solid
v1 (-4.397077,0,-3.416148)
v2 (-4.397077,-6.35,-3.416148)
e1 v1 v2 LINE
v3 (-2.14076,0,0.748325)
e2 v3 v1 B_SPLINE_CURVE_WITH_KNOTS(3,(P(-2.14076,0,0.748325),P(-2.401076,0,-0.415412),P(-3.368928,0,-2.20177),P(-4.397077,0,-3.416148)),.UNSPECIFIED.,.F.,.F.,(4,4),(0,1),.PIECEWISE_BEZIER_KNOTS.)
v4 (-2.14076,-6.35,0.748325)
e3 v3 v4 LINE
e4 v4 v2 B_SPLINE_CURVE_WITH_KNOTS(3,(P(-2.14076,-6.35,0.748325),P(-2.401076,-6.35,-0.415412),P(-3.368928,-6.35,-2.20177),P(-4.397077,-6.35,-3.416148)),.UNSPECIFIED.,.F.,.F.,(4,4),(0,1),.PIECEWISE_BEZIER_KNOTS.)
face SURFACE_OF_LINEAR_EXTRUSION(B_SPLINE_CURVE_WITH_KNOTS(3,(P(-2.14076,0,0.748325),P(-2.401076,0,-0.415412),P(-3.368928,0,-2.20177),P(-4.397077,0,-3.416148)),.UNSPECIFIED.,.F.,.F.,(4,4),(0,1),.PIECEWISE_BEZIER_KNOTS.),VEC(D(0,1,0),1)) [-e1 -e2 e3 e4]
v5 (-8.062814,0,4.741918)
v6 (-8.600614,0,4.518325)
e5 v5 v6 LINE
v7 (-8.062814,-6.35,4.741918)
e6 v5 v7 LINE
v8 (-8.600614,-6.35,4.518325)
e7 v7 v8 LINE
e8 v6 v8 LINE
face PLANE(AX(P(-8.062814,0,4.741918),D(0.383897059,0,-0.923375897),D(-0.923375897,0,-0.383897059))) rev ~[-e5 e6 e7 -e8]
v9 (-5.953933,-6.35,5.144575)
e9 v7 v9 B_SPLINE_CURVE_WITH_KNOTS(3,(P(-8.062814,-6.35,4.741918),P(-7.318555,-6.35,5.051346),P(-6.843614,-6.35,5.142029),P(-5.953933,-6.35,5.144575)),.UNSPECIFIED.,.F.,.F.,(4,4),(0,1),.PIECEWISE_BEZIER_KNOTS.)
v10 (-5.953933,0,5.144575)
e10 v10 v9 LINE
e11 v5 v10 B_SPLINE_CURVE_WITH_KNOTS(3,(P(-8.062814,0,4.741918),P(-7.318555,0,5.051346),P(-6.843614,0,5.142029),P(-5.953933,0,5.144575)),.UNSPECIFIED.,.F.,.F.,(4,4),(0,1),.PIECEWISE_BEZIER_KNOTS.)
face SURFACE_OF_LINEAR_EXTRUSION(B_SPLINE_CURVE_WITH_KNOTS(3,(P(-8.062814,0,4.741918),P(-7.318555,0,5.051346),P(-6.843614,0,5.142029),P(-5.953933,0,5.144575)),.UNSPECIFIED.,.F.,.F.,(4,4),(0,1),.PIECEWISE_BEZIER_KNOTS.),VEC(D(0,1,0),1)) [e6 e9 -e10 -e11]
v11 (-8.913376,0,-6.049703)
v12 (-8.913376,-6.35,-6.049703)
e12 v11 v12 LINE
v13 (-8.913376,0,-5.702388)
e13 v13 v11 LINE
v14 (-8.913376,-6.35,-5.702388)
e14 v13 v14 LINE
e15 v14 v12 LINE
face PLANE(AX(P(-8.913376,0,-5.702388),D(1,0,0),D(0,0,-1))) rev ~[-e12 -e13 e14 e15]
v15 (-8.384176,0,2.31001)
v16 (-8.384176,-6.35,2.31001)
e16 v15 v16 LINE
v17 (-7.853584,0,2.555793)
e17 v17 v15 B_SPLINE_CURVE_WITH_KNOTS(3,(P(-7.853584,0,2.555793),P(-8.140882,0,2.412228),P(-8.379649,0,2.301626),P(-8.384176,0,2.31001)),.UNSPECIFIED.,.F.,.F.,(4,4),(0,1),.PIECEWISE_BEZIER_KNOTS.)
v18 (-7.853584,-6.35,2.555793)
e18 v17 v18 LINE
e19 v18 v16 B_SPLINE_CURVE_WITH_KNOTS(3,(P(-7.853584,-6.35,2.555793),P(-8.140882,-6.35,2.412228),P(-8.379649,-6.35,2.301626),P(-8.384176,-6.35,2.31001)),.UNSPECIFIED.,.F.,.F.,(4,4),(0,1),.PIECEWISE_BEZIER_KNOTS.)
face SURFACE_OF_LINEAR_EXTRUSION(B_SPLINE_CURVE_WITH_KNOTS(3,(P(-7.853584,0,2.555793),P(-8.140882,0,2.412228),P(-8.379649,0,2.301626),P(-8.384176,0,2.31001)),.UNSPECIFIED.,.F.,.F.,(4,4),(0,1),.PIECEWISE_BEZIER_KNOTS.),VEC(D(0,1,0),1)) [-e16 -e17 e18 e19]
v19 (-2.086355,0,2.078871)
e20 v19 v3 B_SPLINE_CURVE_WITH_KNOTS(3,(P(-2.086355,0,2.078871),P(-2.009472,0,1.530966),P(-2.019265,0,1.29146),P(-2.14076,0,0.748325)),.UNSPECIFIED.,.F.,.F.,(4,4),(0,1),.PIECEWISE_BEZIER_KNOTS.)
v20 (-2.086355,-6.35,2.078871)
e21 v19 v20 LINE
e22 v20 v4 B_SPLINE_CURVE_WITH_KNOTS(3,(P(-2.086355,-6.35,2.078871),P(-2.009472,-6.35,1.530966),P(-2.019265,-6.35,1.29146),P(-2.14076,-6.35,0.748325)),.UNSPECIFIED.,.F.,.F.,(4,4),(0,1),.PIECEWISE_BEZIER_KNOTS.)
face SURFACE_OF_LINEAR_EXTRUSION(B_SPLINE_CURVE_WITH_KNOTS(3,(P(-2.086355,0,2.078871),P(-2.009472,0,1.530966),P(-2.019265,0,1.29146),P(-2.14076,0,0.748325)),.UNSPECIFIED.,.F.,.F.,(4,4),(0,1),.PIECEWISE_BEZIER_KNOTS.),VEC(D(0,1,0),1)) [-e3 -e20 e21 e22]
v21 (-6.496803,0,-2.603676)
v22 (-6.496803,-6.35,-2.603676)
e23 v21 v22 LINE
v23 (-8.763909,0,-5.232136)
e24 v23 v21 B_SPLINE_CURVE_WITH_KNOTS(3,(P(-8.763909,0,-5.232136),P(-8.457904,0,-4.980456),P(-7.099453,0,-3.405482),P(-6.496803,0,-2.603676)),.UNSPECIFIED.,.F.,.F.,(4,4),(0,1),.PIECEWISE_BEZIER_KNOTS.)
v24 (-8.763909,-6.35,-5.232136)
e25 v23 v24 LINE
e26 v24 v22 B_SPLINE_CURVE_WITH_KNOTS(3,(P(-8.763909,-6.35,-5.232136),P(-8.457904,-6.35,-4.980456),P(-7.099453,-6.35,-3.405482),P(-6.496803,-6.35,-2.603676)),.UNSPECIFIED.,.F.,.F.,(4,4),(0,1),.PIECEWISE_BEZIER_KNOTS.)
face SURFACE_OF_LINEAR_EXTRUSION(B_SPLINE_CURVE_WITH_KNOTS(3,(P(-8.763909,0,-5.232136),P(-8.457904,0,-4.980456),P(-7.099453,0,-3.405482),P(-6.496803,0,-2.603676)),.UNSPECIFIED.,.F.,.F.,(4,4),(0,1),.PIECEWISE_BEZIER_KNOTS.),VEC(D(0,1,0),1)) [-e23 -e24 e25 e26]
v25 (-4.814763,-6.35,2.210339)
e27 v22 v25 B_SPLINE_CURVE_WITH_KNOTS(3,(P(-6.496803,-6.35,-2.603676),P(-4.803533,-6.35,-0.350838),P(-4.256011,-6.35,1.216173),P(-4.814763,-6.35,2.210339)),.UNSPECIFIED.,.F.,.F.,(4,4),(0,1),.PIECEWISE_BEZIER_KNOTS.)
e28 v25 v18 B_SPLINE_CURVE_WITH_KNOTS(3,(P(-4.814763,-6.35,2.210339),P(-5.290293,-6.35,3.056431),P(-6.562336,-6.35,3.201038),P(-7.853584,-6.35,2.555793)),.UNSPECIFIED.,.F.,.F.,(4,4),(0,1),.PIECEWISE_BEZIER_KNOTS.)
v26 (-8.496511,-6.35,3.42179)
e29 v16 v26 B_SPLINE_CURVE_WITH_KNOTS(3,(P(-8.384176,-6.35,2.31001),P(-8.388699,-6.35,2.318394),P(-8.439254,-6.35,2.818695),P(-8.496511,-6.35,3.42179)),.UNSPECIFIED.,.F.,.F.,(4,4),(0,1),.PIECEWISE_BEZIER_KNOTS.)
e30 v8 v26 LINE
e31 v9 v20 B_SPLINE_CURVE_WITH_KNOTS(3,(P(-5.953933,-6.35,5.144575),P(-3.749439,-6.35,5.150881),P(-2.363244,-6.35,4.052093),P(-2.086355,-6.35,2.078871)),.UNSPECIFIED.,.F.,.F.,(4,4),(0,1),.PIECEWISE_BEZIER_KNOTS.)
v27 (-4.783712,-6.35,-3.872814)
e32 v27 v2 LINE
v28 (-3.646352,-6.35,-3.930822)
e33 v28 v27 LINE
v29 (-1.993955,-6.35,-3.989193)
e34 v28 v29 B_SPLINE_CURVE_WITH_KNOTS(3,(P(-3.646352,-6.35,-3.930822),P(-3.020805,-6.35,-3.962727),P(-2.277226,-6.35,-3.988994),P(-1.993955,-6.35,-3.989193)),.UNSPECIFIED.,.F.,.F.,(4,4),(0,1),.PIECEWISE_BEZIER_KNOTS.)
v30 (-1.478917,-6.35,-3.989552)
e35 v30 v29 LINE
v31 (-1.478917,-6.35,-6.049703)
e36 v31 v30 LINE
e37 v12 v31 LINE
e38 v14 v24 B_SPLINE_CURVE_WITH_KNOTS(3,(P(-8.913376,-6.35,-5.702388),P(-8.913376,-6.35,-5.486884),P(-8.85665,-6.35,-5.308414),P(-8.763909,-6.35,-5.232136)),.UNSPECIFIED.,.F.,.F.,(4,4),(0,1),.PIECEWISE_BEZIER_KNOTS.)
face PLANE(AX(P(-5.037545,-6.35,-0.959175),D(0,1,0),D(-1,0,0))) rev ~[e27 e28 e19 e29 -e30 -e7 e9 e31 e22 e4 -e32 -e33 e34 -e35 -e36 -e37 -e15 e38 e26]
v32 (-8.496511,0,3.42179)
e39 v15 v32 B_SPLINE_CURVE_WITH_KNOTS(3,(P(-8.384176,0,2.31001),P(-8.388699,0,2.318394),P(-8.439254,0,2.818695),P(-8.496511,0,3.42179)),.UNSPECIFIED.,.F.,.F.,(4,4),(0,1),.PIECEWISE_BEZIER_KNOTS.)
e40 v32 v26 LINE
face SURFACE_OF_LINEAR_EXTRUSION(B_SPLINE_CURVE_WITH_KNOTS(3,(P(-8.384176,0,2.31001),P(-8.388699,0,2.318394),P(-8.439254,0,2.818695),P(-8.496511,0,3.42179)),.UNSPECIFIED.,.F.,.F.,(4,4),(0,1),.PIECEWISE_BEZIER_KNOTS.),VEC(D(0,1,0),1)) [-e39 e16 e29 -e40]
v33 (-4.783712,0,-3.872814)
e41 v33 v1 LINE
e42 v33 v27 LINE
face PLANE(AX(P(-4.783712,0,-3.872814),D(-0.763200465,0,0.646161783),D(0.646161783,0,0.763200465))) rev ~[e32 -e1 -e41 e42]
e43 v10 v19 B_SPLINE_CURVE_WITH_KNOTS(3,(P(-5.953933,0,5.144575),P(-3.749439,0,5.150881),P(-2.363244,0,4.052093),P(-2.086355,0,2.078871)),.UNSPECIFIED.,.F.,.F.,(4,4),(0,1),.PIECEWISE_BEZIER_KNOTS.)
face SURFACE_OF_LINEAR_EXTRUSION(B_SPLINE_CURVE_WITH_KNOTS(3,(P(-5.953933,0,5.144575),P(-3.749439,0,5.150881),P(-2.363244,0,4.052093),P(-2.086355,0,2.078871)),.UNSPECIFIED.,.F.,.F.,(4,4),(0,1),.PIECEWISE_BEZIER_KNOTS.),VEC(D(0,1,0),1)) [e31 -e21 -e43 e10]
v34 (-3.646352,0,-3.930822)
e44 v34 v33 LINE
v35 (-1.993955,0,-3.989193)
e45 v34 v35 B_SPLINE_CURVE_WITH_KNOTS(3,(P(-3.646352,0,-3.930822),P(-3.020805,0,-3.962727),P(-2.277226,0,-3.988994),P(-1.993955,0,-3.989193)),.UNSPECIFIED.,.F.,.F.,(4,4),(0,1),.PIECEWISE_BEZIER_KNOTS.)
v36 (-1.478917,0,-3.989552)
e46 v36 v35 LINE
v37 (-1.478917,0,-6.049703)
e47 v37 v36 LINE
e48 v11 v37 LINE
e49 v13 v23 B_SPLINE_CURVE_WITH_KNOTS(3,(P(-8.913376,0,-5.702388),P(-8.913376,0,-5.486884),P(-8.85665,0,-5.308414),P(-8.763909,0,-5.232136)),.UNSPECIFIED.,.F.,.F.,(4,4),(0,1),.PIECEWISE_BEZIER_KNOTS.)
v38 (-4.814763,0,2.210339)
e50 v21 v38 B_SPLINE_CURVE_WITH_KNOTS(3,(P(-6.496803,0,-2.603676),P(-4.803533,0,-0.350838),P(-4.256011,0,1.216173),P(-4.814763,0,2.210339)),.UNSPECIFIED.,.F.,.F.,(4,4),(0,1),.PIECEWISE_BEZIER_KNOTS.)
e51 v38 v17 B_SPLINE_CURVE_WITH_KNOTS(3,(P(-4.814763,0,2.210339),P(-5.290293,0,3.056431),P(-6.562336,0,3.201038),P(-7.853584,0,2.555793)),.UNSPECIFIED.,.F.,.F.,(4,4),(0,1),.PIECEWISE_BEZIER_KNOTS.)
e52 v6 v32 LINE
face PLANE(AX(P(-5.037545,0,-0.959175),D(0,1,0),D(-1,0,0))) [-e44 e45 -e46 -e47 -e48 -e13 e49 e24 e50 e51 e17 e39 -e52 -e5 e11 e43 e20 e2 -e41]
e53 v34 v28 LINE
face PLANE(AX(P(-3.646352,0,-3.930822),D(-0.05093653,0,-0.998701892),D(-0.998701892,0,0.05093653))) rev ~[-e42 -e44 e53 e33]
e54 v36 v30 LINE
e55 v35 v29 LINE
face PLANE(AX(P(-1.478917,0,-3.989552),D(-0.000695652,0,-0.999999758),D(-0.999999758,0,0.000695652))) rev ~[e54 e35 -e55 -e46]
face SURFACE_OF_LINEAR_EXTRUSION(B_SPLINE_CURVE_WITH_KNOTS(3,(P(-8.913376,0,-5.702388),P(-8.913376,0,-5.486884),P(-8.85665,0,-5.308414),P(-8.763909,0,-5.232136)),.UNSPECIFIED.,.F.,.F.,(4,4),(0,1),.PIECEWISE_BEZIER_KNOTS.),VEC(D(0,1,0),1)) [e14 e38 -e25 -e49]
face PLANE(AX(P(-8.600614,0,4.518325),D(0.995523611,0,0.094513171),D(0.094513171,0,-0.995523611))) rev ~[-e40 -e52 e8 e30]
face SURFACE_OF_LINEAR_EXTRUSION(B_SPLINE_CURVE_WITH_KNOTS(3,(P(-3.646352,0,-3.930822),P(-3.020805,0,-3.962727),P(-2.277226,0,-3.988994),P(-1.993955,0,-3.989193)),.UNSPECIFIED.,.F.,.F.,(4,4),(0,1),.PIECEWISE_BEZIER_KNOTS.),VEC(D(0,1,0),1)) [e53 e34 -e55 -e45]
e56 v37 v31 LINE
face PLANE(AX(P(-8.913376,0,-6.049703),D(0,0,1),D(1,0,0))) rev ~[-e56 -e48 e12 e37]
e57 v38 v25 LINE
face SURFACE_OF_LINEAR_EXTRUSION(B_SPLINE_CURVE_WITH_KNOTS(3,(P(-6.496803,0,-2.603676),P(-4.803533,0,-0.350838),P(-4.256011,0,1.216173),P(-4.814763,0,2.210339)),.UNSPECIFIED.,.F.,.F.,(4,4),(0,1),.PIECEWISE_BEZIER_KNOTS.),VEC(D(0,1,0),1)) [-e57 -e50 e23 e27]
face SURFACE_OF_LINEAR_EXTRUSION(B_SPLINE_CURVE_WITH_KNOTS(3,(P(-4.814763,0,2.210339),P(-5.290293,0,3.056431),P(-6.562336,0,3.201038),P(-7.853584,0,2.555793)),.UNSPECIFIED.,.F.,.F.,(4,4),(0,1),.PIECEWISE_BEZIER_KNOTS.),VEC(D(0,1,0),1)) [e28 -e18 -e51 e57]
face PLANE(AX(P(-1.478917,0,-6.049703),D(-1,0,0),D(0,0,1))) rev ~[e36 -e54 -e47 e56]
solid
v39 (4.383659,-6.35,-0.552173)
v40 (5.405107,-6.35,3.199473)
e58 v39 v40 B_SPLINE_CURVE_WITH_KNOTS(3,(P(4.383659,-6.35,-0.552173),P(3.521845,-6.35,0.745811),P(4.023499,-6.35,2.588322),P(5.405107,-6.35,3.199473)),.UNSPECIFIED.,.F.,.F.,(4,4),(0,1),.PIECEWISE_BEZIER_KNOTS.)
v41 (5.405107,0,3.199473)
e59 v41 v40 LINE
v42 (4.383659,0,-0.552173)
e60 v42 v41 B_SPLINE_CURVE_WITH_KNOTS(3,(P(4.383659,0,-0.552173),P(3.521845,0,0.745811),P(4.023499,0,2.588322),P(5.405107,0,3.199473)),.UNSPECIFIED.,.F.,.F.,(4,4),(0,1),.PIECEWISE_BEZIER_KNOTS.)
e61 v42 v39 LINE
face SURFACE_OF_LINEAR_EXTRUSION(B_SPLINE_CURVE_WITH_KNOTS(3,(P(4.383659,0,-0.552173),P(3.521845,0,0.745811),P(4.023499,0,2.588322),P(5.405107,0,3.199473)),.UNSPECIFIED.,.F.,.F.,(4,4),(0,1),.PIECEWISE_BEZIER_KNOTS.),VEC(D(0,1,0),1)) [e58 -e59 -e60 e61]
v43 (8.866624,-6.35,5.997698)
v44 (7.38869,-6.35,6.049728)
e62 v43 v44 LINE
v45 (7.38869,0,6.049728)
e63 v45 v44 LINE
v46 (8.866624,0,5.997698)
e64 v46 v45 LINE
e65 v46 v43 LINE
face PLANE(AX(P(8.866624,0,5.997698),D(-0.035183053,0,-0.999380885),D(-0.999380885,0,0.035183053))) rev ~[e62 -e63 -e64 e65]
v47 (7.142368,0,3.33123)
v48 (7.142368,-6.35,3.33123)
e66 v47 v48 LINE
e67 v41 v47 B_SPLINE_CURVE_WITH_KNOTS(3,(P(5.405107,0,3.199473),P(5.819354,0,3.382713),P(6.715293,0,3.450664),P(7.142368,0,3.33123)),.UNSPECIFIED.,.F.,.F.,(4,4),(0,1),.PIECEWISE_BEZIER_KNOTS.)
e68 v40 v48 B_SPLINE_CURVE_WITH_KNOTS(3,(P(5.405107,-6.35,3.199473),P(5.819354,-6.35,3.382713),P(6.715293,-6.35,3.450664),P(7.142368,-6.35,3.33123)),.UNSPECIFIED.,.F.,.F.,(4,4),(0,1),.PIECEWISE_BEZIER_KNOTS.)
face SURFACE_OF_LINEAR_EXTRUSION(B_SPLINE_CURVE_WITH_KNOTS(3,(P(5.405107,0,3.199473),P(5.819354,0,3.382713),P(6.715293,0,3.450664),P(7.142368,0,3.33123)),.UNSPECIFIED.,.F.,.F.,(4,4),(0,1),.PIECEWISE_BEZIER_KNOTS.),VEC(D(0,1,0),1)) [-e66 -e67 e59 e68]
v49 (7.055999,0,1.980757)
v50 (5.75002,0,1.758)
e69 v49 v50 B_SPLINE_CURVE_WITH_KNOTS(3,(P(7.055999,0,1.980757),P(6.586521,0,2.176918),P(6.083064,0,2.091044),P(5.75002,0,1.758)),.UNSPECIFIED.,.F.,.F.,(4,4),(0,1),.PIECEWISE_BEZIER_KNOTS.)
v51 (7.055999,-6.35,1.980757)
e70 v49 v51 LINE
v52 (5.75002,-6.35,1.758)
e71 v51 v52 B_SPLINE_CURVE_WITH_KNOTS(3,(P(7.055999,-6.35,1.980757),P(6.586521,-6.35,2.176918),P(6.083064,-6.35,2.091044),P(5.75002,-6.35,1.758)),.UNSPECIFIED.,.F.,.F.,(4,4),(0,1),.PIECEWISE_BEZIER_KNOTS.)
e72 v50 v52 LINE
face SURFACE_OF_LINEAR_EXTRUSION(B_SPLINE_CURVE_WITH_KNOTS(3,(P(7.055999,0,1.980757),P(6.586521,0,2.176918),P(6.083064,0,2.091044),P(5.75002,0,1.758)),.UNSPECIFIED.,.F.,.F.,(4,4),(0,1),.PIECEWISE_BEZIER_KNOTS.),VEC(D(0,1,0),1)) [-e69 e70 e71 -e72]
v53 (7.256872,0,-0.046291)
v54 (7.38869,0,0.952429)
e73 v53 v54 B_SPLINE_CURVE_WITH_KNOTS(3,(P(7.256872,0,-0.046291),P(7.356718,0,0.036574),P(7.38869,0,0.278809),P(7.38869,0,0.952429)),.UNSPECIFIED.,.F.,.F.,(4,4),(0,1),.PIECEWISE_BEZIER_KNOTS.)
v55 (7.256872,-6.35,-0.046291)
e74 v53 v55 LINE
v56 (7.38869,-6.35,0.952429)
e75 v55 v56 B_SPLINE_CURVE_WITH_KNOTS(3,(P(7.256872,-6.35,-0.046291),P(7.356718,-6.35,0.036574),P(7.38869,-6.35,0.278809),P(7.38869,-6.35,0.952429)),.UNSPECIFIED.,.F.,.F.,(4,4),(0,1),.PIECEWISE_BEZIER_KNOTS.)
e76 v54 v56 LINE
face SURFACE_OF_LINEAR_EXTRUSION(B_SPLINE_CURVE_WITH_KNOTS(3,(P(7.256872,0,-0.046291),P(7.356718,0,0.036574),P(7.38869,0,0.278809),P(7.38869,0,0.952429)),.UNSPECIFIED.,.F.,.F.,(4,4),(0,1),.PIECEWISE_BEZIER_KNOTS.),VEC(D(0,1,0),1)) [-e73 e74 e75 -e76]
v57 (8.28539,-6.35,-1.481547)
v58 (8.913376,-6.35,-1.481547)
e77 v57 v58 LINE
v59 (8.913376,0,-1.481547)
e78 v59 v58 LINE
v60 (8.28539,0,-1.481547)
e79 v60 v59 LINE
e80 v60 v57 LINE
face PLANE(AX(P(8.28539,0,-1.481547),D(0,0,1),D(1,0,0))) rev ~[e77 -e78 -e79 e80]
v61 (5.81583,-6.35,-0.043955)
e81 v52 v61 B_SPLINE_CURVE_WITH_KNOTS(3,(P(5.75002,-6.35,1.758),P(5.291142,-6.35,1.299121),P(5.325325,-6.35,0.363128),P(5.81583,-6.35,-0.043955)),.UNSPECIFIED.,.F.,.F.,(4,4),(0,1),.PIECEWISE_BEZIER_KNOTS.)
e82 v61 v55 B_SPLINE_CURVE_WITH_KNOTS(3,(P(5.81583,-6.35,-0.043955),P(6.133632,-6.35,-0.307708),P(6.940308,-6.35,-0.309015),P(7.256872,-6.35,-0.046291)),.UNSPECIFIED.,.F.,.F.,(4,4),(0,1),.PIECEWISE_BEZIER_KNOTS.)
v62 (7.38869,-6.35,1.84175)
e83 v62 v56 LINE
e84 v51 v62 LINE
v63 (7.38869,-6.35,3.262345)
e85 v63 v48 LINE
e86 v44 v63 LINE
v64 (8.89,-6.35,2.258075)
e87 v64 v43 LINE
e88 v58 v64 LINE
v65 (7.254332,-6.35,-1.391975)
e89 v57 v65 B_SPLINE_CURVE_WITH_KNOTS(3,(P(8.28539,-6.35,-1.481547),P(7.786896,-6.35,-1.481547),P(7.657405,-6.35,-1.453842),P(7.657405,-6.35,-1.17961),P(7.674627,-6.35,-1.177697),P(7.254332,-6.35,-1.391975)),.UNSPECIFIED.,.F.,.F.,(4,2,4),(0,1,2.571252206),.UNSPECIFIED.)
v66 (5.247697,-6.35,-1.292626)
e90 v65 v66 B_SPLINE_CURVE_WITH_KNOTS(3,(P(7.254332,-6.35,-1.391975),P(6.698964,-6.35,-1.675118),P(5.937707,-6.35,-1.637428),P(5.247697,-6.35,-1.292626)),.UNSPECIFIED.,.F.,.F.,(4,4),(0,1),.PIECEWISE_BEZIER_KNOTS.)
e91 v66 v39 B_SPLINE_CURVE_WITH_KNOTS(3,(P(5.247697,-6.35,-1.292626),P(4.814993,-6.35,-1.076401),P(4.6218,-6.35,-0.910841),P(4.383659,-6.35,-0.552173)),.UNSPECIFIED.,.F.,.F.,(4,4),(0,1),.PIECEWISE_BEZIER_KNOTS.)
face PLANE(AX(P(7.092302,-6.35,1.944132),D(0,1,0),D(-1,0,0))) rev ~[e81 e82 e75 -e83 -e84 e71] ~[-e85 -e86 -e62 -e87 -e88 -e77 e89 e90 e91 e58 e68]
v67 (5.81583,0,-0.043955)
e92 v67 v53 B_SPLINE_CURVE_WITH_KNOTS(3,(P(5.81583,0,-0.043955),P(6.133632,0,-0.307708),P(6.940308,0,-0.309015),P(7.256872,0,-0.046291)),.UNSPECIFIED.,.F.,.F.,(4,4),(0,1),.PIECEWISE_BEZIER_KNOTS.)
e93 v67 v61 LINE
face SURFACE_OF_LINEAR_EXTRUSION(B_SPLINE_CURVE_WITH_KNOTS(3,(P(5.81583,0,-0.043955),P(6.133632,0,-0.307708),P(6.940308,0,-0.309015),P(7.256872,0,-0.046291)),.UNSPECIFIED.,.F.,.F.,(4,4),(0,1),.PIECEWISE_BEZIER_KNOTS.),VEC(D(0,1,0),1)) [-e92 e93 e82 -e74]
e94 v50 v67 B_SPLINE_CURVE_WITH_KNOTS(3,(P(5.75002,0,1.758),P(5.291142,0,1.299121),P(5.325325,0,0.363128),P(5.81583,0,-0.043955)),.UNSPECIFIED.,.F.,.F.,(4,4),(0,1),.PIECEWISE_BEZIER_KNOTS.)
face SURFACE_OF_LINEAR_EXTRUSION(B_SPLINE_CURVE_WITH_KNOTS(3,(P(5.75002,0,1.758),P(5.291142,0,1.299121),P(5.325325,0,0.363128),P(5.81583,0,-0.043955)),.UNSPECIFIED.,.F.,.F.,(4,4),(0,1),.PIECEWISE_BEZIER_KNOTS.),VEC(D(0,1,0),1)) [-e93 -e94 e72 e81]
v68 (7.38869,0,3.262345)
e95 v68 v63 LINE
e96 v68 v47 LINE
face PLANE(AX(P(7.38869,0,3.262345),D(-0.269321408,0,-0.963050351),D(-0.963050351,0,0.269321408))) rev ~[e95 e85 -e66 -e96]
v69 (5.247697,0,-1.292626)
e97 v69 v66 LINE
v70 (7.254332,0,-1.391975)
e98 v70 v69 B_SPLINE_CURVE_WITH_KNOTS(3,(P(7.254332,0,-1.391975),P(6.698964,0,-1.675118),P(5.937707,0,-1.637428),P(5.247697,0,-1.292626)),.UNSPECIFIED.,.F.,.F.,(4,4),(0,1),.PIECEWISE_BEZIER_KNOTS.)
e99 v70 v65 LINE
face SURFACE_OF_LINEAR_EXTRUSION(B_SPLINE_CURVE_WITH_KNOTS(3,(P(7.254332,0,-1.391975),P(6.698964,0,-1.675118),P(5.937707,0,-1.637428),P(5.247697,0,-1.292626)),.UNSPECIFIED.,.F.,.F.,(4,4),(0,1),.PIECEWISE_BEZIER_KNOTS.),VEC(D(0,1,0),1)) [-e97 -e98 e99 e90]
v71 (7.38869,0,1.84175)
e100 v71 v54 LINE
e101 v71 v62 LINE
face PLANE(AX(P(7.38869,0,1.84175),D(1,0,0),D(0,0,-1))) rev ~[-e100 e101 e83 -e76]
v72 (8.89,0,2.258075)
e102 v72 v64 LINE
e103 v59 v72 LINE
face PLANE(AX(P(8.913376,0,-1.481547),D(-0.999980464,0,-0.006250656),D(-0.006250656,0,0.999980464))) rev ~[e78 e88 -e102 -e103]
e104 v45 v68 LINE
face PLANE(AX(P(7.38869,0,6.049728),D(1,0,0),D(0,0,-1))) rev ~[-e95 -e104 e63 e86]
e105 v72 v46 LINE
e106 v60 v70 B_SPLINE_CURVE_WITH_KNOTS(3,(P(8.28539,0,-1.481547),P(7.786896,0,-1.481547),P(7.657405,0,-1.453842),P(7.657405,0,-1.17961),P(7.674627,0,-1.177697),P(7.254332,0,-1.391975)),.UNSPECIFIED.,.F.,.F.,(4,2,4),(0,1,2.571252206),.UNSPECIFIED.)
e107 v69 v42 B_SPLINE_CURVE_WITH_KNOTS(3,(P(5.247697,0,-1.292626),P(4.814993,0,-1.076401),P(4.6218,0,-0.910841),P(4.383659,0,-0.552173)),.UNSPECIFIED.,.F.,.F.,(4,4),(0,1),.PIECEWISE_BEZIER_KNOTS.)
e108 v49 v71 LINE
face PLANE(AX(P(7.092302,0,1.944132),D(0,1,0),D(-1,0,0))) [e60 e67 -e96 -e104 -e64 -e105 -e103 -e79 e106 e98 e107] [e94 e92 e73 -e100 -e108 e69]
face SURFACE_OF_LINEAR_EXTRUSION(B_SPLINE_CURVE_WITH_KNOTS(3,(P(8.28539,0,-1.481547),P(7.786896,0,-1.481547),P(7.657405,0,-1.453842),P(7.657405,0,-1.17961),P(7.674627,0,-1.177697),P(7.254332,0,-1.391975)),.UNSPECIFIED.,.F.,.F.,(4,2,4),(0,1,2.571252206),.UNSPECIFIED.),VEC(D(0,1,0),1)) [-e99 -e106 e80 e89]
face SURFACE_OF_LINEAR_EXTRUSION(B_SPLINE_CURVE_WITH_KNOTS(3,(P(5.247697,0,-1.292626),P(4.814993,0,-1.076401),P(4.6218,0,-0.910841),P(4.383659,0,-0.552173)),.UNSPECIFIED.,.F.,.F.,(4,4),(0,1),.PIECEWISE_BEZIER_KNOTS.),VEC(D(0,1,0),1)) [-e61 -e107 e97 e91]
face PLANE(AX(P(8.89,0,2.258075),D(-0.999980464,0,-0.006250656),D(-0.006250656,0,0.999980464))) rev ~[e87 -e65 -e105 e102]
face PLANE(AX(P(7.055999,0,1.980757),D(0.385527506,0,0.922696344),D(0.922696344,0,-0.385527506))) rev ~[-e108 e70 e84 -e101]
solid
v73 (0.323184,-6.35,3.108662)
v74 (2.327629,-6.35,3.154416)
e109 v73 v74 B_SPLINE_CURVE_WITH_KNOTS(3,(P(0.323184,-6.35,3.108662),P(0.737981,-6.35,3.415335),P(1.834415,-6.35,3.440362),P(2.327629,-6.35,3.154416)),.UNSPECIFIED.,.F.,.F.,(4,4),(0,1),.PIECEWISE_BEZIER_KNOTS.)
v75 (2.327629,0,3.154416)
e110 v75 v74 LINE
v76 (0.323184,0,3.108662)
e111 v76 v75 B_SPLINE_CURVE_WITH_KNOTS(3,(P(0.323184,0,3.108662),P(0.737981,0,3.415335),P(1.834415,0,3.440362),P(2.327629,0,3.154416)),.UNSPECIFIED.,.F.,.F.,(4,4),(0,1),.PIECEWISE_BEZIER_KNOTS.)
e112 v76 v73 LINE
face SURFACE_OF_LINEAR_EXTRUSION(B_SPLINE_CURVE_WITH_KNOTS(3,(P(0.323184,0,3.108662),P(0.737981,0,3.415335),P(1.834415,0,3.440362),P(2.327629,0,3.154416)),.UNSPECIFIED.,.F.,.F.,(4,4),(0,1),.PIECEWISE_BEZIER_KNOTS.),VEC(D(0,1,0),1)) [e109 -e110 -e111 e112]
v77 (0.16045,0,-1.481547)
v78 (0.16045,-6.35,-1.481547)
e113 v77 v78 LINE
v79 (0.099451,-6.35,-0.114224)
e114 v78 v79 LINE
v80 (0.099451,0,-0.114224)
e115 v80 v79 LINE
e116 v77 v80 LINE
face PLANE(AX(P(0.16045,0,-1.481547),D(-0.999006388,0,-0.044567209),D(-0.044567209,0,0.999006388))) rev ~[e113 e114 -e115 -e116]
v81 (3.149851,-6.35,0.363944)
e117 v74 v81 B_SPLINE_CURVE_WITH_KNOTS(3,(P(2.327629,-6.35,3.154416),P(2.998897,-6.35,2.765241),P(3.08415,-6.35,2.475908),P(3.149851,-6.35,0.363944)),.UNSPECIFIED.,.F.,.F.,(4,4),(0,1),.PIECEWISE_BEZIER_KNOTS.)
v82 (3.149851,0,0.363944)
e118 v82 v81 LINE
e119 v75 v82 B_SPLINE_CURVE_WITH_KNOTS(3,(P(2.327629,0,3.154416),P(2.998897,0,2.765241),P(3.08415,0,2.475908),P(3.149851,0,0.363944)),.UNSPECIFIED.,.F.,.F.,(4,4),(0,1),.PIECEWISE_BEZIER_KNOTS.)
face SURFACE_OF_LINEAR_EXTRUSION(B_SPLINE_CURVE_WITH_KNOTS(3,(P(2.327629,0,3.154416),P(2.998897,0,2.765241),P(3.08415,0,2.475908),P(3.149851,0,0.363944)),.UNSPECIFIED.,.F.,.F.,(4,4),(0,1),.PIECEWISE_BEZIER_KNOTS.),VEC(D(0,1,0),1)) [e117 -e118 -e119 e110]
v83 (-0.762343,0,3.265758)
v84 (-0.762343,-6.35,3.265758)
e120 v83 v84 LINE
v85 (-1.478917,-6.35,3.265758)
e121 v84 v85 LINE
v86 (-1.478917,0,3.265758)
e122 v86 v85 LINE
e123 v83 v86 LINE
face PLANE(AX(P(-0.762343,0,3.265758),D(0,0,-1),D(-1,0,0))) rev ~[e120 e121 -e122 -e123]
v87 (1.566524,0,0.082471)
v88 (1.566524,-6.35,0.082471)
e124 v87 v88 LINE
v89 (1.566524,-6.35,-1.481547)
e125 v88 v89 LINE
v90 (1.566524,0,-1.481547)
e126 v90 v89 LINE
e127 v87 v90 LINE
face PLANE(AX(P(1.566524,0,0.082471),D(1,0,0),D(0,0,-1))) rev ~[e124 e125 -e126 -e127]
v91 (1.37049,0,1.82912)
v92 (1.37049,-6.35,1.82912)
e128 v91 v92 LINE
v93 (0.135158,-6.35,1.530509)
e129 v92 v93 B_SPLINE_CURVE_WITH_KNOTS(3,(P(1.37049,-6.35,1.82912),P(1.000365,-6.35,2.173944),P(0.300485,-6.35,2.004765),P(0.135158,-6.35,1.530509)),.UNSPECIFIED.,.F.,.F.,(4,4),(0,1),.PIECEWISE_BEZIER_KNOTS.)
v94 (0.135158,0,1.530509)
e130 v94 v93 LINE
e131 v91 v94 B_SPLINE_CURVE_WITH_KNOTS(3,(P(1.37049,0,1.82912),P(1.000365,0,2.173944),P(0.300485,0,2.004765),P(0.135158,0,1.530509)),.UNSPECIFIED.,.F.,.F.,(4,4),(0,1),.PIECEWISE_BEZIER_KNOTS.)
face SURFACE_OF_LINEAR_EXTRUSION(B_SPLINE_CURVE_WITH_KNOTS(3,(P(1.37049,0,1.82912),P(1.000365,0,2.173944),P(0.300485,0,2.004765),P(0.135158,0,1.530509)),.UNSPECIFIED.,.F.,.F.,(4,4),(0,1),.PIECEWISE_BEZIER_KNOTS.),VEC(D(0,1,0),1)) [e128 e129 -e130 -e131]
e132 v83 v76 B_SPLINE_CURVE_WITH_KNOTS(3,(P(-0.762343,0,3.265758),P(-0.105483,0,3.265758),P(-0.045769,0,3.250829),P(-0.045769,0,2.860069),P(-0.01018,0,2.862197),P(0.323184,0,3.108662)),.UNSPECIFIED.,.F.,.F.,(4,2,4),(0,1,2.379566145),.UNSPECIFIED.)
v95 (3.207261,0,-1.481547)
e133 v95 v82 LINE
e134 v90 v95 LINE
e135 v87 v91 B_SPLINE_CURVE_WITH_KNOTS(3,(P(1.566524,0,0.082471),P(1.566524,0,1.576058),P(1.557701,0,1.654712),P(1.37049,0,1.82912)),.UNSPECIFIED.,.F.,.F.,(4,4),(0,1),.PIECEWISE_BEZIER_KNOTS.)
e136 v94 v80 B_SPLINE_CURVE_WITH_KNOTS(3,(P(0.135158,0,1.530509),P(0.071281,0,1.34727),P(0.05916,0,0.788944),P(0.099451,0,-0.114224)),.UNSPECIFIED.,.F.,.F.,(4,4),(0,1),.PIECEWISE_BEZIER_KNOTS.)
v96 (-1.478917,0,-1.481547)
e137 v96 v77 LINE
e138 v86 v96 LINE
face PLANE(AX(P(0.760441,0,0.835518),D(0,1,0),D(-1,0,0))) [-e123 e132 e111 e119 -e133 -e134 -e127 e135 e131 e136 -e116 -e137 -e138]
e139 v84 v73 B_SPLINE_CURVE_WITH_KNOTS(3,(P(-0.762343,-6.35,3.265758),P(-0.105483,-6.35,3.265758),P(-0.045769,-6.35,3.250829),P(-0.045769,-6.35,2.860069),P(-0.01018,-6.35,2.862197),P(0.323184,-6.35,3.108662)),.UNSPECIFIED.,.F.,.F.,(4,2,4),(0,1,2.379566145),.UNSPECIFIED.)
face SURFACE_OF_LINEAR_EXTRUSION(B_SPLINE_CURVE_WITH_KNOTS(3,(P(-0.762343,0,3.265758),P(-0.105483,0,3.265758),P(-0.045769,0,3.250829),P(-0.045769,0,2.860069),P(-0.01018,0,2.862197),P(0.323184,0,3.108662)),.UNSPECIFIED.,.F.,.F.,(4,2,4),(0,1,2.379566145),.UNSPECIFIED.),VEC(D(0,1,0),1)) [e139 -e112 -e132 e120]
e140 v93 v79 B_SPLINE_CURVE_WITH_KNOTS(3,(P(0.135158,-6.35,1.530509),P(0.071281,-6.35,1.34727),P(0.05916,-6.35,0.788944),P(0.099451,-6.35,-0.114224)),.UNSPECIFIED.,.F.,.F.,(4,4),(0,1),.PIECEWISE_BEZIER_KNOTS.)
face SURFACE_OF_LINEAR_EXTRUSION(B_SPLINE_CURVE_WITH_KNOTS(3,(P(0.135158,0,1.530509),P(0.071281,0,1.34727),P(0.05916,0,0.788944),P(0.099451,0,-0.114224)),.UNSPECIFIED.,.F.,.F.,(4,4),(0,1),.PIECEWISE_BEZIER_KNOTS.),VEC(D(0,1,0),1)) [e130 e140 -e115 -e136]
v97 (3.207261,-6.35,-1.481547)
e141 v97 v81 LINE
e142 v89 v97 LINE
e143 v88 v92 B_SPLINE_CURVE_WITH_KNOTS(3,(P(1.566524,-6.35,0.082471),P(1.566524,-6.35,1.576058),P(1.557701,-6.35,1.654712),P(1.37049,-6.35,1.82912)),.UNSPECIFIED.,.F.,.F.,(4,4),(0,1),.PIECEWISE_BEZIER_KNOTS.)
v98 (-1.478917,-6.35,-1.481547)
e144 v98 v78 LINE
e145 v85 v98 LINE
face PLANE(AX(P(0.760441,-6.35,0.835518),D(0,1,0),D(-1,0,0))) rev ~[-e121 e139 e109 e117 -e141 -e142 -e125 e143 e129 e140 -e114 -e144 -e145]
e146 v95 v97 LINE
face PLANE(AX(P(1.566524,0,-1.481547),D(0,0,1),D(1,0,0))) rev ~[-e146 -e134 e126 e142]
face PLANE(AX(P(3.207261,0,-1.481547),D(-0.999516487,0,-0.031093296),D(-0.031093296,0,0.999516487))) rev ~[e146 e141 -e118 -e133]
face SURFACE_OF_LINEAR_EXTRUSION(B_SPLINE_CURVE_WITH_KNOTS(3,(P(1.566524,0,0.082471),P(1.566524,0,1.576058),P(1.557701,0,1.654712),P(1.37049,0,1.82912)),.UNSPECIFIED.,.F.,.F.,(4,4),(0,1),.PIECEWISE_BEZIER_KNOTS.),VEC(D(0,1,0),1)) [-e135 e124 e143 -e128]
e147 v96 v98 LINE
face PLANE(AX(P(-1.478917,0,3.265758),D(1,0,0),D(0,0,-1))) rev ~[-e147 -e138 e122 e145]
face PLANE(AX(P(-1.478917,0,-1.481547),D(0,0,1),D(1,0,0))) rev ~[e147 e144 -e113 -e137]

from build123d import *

# Parameters (mm, degrees)
F1_DEPTH = 6.35


# Not quite as in the source:
# - ends of sketch curves that miss each other by under 0.0002 mm in the source are joined


with BuildPart() as f1:
    # F0 (on Front) → F1 (new body)
    with BuildSketch(Plane.XZ):
        with BuildLine():
            add(Edge.make_bspline(
                [(-8.9133755493, -5.7023881004), (-8.9133755493, -5.4868837545), (-8.8566497364, -5.3084137598), (-8.7639088993, -5.2321362172)],
                knots=[0, 0, 0, 0, 1, 1, 1, 1], degree=3))
            Line((-8.9133755493, -5.7023881004), (-8.9133755493, -6.0497027056))
            Line((-8.9133755493, -6.0497027056), (-5.196146377, -6.0497027056))
            Line((-5.196146377, -6.0497027056), (-1.4789172047, -6.0497027056))
            Line((-1.4789172047, -6.0497027056), (-1.4789172047, -5.0196271518))
            Line((-1.4789172047, -5.0196271518), (-1.4789172047, -3.9895515981))
            Line((-1.4789172047, -3.9895515981), (-1.9939549816, -3.9891933109))
            add(Edge.make_bspline(
                [(-3.6463520247, -3.9308220643), (-3.0208050553, -3.9627266392), (-2.2772257589, -3.9889935658), (-1.9939549816, -3.9891933109)],
                knots=[0, 0, 0, 0, 1, 1, 1, 1], degree=3))
            Line((-3.6463520247, -3.9308220643), (-4.7837121867, -3.8728135834))
            Line((-4.7837121867, -3.8728135834), (-4.3970773583, -3.4161479489))
            add(Edge.make_bspline(
                [(-2.1407595581, 0.7483248017), (-2.4010757734, -0.4154115645), (-3.3689284937, -2.2017703813), (-4.3970773583, -3.4161479489)],
                knots=[0, 0, 0, 0, 1, 1, 1, 1], degree=3))
            add(Edge.make_bspline(
                [(-2.0863554459, 2.0788707074), (-2.0094715023, 1.5309663546), (-2.0192652815, 1.2914603526), (-2.1407595581, 0.7483248017)],
                knots=[0, 0, 0, 0, 1, 1, 1, 1], degree=3))
            add(Edge.make_bspline(
                [(-5.9539326546, 5.1445753005), (-3.749439299, 5.1508811543), (-2.3632442333, 4.0520932911), (-2.0863554459, 2.0788707074)],
                knots=[0, 0, 0, 0, 1, 1, 1, 1], degree=3))
            add(Edge.make_bspline(
                [(-8.0628135016, 4.7419178708), (-7.318555251, 5.0513462971), (-6.8436142847, 5.1420287746), (-5.9539326546, 5.1445753005)],
                knots=[0, 0, 0, 0, 1, 1, 1, 1], degree=3))
            Line((-8.0628135016, 4.7419178708), (-8.6006141568, 4.5183251925))
            Line((-8.6006141568, 4.5183251925), (-8.4965111385, 3.4217900597))
            add(Edge.make_bspline(
                [(-8.3841755772, 2.3100098088), (-8.3886989524, 2.318393728), (-8.4392541649, 2.8186951545), (-8.4965111385, 3.4217900597)],
                knots=[0, 0, 0, 0, 1, 1, 1, 1], degree=3))
            add(Edge.make_bspline(
                [(-7.8535836594, 2.5557930016), (-8.14088248, 2.4122282367), (-8.379648619, 2.3016258895), (-8.3841755772, 2.3100098088)],
                knots=[0, 0, 0, 0, 1, 1, 1, 1], degree=3))
            add(Edge.make_bspline(
                [(-4.8147631425, 2.2103388025), (-5.2902934912, 3.056431218), (-6.562335584, 3.2010377028), (-7.8535836594, 2.5557930016)],
                knots=[0, 0, 0, 0, 1, 1, 1, 1], degree=3))
            add(Edge.make_bspline(
                [(-6.496803073, -2.6036763037), (-4.8035326318, -0.3508383673), (-4.2560107506, 1.2161734739), (-4.8147631425, 2.2103388025)],
                knots=[0, 0, 0, 0, 1, 1, 1, 1], degree=3))
            add(Edge.make_bspline(
                [(-8.7639088993, -5.2321362172), (-8.4579039067, -4.9804556178), (-7.0994528064, -3.4054817404), (-6.496803073, -2.6036763037)],
                knots=[0, 0, 0, 0, 1, 1, 1, 1], degree=3))
        make_face()
    extrude(amount=F1_DEPTH)


with BuildPart() as f1b:
    # F0 (on Front) → F1, piece 2 (new body)
    with BuildSketch(Plane.XZ):
        with BuildLine():
            add(Edge.make_bspline(
                [(5.247696732, -1.2926256975), (4.814993342, -1.0764011944), (4.6218004326, -0.9108411814), (4.3836586089, -0.5521733522)],
                knots=[0, 0, 0, 0, 1, 1, 1, 1], degree=3))
            add(Edge.make_bspline(
                [(7.2543322795, -1.3919751411), (6.6989639097, -1.6751178307), (5.9377067253, -1.6374278141), (5.247696732, -1.2926256975)],
                knots=[0, 0, 0, 0, 1, 1, 1, 1], degree=3))
            add(Edge.make_bspline(
                [(7.6574053223, -1.3471892475), (7.6574053223, -1.1796102863), (7.6746272899, -1.177697033), (7.2543322795, -1.3919751411)],
                knots=[0, 0, 0, 0, 1, 1, 1, 1], degree=3))
            add(Edge.make_bspline(
                [(8.2853904358, -1.4815469284), (7.7868956723, -1.4815469284), (7.6574053223, -1.4538423746), (7.6574053223, -1.3471892475)],
                knots=[0, 0, 0, 0, 1, 1, 1, 1], degree=3))
            Line((8.2853904358, -1.4815469284), (8.9133755493, -1.4815469284))
            Line((8.9133755493, -1.4815469284), (8.89, 2.2580751908))
            Line((8.89, 2.2580751908), (8.8666244507, 5.9976976458))
            Line((8.8666244507, 5.9976976458), (8.1276572056, 6.0237128757))
            Line((8.1276572056, 6.0237128757), (7.3886899605, 6.0497281056))
            Line((7.3886899605, 6.0497281056), (7.3886899605, 4.6560364412))
            Line((7.3886899605, 4.6560364412), (7.3886899605, 3.2623451126))
            Line((7.3886899605, 3.2623451126), (7.1423675454, 3.3312302956))
            add(Edge.make_bspline(
                [(5.4051066081, 3.1994728837), (5.8193537314, 3.3827134718), (6.7152928465, 3.4506635254), (7.1423675454, 3.3312302956)],
                knots=[0, 0, 0, 0, 1, 1, 1, 1], degree=3))
            add(Edge.make_bspline(
                [(4.3836586089, -0.5521733522), (3.521845225, 0.7458114174), (4.0234991855, 2.5883218919), (5.4051066081, 3.1994728837)],
                knots=[0, 0, 0, 0, 1, 1, 1, 1], degree=3))
        make_face()
        with BuildLine():
            add(Edge.make_bspline(
                [(7.2568716397, -0.0462907077), (7.3567182067, 0.0365739442), (7.3886899605, 0.2788091986), (7.3886899605, 0.9524293463)],
                knots=[0, 0, 0, 0, 1, 1, 1, 1], degree=3))
            add(Edge.make_bspline(
                [(5.8158299773, -0.0439546755), (6.1336315743, -0.3077077603), (6.9403079248, -0.3090146127), (7.2568716397, -0.0462907077)],
                knots=[0, 0, 0, 0, 1, 1, 1, 1], degree=3))
            add(Edge.make_bspline(
                [(5.7500197937, 1.7580003809), (5.291141736, 1.2991214275), (5.3253250172, 0.3631276005), (5.8158299773, -0.0439546755)],
                knots=[0, 0, 0, 0, 1, 1, 1, 1], degree=3))
            add(Edge.make_bspline(
                [(7.0559988453, 1.9807573545), (6.5865208623, 2.1769177772), (6.0830638217, 2.091044409), (5.7500197937, 1.7580003809)],
                knots=[0, 0, 0, 0, 1, 1, 1, 1], degree=3))
            Line((7.0559988453, 1.9807573545), (7.3886899605, 1.8417500021))
            Line((7.3886899605, 1.8417500021), (7.3886899605, 0.9524293463))
        make_face(mode=Mode.SUBTRACT)
    extrude(amount=F1_DEPTH)


with BuildPart() as f1c:
    # F0 (on Front) → F1, piece 3 (new body)
    with BuildSketch(Plane.XZ):
        with BuildLine():
            add(Edge.make_bspline(
                [(-0.7623429064, 3.2657577977), (-0.1054834315, 3.2657577977), (-0.0457686081, 3.2508288679), (-0.0457686081, 3.0866142232)],
                knots=[0, 0, 0, 0, 1, 1, 1, 1], degree=3))
            Line((-0.7623429064, 3.2657577977), (-1.4789172047, 3.2657577977))
            Line((-1.4789172047, 3.2657577977), (-1.4789172047, 0.8921054347))
            Line((-1.4789172047, 0.8921054347), (-1.4789172047, -1.4815469284))
            Line((-1.4789172047, -1.4815469284), (-0.6592341349, -1.4815469284))
            Line((-0.6592341349, -1.4815469284), (0.1604498306, -1.4815469284))
            Line((0.1604498306, -1.4815469284), (0.0994514435, -0.1142237426))
            add(Edge.make_bspline(
                [(0.1351583407, 1.5305086428), (0.0712811164, 1.3472698461), (0.0591602621, 0.7889438158), (0.0994514435, -0.1142237426)],
                knots=[0, 0, 0, 0, 1, 1, 1, 1], degree=3))
            add(Edge.make_bspline(
                [(1.3704903322, 1.82912038), (1.0003653757, 2.1739439938), (0.3004854671, 2.0047652806), (0.1351583407, 1.5305086428)],
                knots=[0, 0, 0, 0, 1, 1, 1, 1], degree=3))
            add(Edge.make_bspline(
                [(1.566523563, 0.082470528), (1.566523563, 1.576057688), (1.557700742, 1.6547115702), (1.3704903322, 1.82912038)],
                knots=[0, 0, 0, 0, 1, 1, 1, 1], degree=3))
            Line((1.566523563, 0.082470528), (1.566523563, -1.4815469284))
            Line((1.566523563, -1.4815469284), (2.3868927527, -1.4815469284))
            Line((2.3868927527, -1.4815469284), (3.2072610466, -1.4815469284))
            Line((3.2072610466, -1.4815469284), (3.1498509053, 0.3639435995))
            add(Edge.make_bspline(
                [(2.3276293711, 3.1544155875), (2.9988973636, 2.7652405033), (3.0841499993, 2.4759084031), (3.1498509053, 0.3639435995)],
                knots=[0, 0, 0, 0, 1, 1, 1, 1], degree=3))
            add(Edge.make_bspline(
                [(0.3231838537, 3.1086623186), (0.7379809478, 3.415334621), (1.8344148644, 3.4403618741), (2.3276293711, 3.1544155875)],
                knots=[0, 0, 0, 0, 1, 1, 1, 1], degree=3))
            add(Edge.make_bspline(
                [(-0.0457686081, 3.0866142232), (-0.0457686081, 2.8600692588), (-0.0101799456, 2.8621965887), (0.3231838537, 3.1086623186)],
                knots=[0, 0, 0, 0, 1, 1, 1, 1], degree=3))
        make_face()
    extrude(amount=F1_DEPTH)


solid = Compound([f1.part, f1b.part, f1c.part])
